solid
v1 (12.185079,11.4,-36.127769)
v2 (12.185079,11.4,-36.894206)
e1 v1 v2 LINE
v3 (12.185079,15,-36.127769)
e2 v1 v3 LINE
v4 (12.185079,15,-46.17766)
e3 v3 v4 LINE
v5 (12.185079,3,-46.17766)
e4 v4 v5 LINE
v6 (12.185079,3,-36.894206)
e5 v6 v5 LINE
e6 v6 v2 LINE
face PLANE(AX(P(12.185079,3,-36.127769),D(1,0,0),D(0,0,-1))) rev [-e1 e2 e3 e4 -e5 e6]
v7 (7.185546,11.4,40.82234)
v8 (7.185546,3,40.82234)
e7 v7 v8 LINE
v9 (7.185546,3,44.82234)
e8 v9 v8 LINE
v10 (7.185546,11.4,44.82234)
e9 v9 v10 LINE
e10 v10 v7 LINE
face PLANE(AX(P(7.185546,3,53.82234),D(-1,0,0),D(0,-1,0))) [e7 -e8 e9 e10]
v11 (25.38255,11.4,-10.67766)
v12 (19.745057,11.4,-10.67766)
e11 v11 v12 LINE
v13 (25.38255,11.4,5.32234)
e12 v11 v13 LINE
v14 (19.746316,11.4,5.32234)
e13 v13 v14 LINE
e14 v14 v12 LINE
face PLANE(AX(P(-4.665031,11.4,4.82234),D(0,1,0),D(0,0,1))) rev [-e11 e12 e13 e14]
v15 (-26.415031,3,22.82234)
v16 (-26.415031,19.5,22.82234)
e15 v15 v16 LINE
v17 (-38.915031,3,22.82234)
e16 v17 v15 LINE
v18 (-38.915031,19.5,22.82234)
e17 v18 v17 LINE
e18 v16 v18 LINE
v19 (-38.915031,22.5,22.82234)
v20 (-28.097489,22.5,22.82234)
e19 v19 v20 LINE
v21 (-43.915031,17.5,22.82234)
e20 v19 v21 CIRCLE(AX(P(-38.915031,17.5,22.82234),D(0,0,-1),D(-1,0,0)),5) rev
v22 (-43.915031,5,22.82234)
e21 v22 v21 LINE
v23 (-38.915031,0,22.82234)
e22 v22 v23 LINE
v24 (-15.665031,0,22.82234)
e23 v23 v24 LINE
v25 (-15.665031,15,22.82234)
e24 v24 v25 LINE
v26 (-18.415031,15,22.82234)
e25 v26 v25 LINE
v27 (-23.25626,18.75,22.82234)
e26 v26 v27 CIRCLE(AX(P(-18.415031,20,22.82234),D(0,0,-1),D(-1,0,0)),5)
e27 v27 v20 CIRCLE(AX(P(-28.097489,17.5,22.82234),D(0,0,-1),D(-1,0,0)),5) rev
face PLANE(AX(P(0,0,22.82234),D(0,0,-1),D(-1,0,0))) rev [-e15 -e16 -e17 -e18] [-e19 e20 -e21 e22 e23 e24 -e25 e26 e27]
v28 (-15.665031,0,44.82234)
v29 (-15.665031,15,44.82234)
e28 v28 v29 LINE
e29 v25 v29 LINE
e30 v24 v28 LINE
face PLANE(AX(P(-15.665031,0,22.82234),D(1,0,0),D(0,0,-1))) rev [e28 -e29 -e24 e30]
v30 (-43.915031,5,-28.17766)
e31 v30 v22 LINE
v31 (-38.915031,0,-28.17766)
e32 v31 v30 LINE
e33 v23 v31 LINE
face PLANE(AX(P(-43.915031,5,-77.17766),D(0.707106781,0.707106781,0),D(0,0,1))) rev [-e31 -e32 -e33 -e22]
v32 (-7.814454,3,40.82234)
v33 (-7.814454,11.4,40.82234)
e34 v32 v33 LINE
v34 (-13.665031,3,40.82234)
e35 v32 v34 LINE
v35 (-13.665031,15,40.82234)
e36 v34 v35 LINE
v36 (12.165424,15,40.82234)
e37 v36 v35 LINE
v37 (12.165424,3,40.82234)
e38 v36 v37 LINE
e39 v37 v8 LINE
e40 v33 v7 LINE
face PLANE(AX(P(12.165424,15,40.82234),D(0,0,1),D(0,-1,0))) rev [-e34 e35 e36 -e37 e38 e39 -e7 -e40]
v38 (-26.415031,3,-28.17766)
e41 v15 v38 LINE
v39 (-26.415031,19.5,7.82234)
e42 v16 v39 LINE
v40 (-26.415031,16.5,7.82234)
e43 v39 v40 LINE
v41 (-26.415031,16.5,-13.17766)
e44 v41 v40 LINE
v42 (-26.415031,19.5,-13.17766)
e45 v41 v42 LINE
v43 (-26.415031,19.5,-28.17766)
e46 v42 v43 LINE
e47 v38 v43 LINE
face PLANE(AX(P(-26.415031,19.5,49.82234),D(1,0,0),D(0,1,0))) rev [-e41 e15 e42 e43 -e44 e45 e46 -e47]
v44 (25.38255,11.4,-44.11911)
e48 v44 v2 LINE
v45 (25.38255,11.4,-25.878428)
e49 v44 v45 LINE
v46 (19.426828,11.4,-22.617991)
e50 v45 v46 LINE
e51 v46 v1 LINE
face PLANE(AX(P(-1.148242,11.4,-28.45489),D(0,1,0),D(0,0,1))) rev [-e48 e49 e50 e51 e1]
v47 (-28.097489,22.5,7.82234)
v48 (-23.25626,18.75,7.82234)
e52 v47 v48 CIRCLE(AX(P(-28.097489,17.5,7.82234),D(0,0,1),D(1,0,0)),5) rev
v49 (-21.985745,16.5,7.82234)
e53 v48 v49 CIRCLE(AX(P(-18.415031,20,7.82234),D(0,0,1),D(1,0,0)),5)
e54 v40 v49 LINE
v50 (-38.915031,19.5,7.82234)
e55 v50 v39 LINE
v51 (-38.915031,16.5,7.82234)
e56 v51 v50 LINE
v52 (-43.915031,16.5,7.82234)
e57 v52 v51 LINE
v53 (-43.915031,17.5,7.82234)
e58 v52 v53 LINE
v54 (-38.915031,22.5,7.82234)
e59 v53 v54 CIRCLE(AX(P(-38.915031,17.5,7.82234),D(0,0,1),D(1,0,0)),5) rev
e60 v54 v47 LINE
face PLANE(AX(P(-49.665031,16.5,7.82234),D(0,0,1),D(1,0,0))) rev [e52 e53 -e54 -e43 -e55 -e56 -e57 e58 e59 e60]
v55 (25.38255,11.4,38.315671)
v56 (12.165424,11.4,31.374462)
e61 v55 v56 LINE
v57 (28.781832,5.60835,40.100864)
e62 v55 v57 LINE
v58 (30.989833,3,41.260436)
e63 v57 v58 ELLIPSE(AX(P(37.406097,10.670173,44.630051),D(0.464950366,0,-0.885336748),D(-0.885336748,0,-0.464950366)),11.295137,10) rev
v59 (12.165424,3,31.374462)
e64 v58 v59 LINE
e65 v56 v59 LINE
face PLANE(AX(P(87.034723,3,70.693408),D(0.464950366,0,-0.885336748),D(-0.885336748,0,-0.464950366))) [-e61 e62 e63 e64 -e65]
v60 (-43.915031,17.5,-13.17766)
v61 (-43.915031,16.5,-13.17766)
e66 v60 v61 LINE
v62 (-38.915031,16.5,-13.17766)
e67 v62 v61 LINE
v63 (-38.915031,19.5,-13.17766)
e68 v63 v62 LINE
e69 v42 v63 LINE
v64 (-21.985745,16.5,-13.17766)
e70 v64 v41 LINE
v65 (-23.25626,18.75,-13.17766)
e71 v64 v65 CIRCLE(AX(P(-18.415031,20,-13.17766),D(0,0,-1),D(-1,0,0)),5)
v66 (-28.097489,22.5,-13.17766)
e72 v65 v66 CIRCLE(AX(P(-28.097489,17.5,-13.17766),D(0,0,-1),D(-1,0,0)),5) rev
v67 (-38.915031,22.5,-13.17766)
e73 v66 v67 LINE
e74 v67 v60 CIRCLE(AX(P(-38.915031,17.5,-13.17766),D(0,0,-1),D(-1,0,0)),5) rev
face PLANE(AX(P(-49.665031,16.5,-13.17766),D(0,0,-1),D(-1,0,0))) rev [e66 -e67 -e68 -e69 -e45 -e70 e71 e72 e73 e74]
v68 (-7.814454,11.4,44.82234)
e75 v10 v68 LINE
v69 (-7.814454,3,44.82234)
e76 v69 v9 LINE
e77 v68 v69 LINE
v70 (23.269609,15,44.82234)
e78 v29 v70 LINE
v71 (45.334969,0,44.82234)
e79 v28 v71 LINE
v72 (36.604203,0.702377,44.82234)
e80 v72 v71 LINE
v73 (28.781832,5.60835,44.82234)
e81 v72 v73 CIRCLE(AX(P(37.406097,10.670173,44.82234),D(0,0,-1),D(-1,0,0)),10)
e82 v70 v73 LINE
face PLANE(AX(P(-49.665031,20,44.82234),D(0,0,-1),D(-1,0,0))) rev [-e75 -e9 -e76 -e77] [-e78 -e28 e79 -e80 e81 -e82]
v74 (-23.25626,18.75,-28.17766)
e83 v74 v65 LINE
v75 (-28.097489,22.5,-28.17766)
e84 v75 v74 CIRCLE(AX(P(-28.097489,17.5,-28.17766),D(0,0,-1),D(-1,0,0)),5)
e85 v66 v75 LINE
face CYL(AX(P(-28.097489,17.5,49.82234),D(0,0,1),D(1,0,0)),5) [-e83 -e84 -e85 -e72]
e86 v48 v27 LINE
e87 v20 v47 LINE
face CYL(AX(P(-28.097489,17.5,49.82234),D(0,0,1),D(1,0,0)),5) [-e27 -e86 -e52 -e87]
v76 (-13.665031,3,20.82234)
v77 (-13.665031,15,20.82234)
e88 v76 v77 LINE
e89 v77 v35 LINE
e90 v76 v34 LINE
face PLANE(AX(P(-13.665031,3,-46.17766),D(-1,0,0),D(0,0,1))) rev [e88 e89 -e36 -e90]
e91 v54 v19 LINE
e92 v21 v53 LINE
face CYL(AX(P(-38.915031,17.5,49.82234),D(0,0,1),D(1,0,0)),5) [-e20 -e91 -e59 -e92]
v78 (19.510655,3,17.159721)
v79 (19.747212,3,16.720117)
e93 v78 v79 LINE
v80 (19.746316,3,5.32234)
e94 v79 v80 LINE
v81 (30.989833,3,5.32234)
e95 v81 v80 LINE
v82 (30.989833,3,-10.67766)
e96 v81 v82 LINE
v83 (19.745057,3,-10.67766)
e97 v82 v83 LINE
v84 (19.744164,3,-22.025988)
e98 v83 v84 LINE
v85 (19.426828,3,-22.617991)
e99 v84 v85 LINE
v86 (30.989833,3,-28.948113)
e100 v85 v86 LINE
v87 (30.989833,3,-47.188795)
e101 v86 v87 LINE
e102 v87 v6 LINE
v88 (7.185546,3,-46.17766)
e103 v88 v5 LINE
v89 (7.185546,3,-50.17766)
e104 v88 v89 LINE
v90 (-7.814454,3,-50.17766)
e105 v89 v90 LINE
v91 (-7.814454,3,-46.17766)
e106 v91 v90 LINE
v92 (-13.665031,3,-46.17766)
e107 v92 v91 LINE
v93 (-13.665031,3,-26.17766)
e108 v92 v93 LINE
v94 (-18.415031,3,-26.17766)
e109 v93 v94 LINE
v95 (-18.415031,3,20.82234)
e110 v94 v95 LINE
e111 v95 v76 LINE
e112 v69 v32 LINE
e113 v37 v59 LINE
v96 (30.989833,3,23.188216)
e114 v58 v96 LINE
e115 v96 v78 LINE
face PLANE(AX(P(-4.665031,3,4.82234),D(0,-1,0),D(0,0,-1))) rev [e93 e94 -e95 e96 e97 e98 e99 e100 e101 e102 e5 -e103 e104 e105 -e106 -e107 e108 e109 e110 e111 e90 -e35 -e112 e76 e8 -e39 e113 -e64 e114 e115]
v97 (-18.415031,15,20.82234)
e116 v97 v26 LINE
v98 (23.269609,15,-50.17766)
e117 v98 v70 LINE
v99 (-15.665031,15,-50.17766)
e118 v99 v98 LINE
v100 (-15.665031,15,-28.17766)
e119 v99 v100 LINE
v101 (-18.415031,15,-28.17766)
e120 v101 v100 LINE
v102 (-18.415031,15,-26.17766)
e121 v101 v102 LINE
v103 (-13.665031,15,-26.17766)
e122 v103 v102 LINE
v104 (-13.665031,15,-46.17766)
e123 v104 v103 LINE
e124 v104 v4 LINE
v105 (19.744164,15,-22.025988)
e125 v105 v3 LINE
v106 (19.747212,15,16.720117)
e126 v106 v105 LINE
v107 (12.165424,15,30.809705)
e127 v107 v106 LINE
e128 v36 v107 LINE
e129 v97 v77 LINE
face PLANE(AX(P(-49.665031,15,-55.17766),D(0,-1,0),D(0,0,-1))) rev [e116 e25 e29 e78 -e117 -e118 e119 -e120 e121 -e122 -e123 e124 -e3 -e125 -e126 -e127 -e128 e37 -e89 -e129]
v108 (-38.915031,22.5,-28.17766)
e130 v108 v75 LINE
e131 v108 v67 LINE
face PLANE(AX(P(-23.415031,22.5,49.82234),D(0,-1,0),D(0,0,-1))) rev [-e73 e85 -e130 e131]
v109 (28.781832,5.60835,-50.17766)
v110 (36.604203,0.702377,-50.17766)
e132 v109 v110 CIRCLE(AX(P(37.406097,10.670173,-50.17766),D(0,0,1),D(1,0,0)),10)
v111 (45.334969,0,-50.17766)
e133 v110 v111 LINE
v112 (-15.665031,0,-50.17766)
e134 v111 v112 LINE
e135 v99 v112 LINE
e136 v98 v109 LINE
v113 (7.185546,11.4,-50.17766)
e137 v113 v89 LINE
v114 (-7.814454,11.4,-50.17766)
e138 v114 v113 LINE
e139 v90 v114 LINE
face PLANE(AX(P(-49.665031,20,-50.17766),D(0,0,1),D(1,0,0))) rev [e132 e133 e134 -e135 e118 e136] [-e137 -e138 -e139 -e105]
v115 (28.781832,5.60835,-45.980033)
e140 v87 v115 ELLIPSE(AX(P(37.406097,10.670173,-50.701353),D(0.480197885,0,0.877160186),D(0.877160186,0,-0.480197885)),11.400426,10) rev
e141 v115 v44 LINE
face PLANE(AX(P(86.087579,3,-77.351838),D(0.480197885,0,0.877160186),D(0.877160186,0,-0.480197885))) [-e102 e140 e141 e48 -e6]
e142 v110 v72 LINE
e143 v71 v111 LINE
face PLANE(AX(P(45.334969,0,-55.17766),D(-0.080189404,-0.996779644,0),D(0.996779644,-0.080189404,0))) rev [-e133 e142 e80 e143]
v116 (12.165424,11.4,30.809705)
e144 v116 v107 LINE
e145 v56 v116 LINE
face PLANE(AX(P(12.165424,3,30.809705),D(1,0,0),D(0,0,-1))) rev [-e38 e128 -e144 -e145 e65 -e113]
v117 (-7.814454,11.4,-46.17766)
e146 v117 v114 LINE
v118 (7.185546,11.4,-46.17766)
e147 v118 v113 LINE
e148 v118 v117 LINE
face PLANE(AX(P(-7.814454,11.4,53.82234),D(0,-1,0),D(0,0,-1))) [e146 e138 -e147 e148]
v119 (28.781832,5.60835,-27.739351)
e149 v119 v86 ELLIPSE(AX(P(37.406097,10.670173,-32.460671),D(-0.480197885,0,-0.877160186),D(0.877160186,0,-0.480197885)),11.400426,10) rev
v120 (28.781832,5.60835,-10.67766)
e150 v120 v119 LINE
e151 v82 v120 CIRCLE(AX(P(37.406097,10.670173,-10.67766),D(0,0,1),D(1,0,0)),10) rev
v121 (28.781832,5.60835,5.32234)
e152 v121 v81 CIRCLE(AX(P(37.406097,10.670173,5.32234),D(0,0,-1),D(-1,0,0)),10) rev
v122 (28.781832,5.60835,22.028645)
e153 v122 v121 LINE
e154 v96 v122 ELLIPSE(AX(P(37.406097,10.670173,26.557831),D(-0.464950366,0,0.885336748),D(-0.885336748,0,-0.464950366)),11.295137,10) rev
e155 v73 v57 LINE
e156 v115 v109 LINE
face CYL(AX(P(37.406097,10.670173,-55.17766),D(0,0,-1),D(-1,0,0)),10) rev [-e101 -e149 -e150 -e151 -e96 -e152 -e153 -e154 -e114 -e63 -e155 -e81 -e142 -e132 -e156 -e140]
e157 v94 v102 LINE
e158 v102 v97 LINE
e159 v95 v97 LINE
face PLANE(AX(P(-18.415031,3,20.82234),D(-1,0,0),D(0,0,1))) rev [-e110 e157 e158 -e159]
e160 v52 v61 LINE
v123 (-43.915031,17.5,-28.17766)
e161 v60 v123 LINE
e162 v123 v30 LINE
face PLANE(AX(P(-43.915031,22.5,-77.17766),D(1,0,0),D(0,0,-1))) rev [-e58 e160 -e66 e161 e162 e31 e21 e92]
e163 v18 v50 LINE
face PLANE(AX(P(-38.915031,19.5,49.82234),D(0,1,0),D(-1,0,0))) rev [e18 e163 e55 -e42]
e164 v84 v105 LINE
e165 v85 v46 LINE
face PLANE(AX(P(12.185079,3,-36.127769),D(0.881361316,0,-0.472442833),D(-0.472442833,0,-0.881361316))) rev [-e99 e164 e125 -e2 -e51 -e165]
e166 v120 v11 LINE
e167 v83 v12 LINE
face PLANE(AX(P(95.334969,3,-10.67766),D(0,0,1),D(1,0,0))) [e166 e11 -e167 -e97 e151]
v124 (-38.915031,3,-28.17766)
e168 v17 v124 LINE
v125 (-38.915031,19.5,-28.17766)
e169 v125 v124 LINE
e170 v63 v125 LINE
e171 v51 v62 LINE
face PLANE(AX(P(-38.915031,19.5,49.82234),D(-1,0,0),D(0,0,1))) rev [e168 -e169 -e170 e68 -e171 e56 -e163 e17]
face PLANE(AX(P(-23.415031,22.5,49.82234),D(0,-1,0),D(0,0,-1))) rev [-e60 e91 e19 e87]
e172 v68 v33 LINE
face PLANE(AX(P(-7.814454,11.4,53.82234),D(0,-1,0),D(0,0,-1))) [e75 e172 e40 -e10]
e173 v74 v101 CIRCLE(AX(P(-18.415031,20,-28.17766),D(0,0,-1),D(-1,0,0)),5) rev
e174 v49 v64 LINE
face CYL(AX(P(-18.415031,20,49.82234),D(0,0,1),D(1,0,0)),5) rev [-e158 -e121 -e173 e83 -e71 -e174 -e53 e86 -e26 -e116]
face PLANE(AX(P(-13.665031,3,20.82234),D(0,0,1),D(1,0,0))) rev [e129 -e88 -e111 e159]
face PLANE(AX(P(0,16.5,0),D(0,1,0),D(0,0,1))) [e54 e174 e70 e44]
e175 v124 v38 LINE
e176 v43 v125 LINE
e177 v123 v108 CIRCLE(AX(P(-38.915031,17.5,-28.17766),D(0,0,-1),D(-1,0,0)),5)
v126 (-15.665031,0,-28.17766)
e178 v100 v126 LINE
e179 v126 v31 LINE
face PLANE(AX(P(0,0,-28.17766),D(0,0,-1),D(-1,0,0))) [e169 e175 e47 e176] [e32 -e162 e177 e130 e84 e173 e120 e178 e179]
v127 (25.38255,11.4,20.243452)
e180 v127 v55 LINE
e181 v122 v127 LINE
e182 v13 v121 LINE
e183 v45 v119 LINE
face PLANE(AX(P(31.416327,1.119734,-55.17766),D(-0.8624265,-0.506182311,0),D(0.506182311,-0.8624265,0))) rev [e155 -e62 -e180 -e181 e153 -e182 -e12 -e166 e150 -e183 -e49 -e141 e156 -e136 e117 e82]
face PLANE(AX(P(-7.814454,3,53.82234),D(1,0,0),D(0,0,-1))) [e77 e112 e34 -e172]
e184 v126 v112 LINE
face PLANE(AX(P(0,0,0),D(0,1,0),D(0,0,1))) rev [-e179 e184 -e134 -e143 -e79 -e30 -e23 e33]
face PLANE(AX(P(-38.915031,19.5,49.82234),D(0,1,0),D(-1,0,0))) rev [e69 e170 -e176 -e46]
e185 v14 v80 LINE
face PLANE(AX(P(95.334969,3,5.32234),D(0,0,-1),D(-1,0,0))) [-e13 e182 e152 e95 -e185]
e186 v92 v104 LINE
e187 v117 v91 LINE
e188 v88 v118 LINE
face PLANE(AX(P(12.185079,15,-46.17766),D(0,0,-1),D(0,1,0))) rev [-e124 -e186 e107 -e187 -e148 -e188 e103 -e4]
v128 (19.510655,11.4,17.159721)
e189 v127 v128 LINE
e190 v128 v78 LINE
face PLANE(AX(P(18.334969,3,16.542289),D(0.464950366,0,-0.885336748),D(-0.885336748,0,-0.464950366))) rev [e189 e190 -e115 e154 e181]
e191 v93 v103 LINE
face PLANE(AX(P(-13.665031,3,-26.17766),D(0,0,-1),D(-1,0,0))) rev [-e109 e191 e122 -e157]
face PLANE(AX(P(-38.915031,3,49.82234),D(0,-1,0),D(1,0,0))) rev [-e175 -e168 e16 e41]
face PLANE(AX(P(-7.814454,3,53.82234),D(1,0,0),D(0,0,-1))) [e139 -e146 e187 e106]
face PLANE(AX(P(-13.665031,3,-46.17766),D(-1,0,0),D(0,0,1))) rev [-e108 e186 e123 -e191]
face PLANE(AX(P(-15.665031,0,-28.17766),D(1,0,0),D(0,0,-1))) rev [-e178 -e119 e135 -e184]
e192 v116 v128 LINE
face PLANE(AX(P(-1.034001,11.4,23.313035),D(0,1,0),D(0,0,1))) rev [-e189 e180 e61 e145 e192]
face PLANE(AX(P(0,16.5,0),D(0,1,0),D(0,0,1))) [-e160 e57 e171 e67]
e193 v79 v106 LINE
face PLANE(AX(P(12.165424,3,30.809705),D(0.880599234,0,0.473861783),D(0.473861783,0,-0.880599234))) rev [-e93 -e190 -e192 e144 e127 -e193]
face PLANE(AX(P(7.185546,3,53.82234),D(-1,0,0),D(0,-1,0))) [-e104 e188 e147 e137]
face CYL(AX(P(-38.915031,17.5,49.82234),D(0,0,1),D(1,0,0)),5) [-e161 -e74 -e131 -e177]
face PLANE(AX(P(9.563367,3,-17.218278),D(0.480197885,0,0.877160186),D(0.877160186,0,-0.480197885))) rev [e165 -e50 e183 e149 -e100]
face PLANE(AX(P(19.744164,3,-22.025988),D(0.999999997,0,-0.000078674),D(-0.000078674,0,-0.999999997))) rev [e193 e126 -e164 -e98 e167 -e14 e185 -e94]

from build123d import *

# Parameters (mm, degrees)
SKETCH1_W                = 95
SKETCH1_H                = 95
BOSS_EXTRUDE1_DEPTH      = 20
SKETCH2_W                = 15
SKETCH2_H                = 8.4
CUT_EXTRUDE1_DEPTH       = 50
CUT_EXTRUDE3_DEPTH       = 100
FILLET1_R                = 10
CUT_EXTRUDE4_DEPTH       = 17
SKETCH8_W                = 15
SKETCH8_H                = 8.4
CUT_EXTRUDE5_DEPTH       = 4
SKETCH9_W                = 15
SKETCH9_H                = 8.4
CUT_EXTRUDE6_DEPTH       = 4
SKETCH10_W               = 15
SKETCH10_H               = 8.4
CUT_EXTRUDE7_DEPTH       = 100
SKETCH11_W               = 15
SKETCH11_H               = 8.4
CUT_EXTRUDE8_DEPTH       = 100
SKETCH12_W               = 96.22761595
SKETCH12_H               = 5
CUT_EXTRUDE9_DEPTH       = 100
SKETCH14_W               = 16
SKETCH14_H               = 8.4
CUT_EXTRUDE10_DEPTH      = 100
SKETCH15_W               = 16
SKETCH15_H               = 8.4
CUT_EXTRUDE11_DEPTH      = 100
SKETCH16_W               = 16
SKETCH16_H               = 8.4
CUT_EXTRUDE13_DEPTH      = 100
CUT_EXTRUDE16_DEPTH      = 12
SKETCH21_W               = 23.779532914
SKETCH21_H               = 2
BOSS_EXTRUDE2_DEPTH      = 12
SKETCH23_W               = 23.759878039
SKETCH23_H               = 2
BOSS_EXTRUDE3_DEPTH      = 12
CUT_EXTRUDE19_DEPTH      = 100
CUT_EXTRUDE19_DEPTH_BACK = 100
SKETCH24_W               = 15
SKETCH24_H               = 8.4
SKETCH26_W               = 20
SKETCH26_H               = 95
BOSS_EXTRUDE4_DEPTH      = 20
SKETCH31_W               = 95
SKETCH31_H               = 20
BOSS_EXTRUDE6_DEPTH      = 10
SKETCH32_W               = 12.5
SKETCH32_H               = 16.5
CUT_EXTRUDE22_DEPTH      = 100
SKETCH33_W               = 3.75
SKETCH33_H               = 20
CUT_EXTRUDE23_DEPTH      = 100
SKETCH34_W               = 26.25
SKETCH34_H               = 12.5
CUT_EXTRUDE24_DEPTH      = 100
SKETCH35_W               = 34
SKETCH35_H               = 47.07285681
CUT_EXTRUDE25_DEPTH      = 22
SKETCH36_W               = 34
SKETCH36_H               = 30.604426896
CUT_EXTRUDE26_DEPTH      = 22
SKETCH37_W               = 26.25
SKETCH37_H               = 21
CUT_EXTRUDE28_DEPTH      = 6
SKETCH38_W               = 5.75
SKETCH38_H               = 22.5
CUT_EXTRUDE29_DEPTH      = 100
CHAMFER1_SIZE            = 5
SKETCH39_W               = 2.070576792
SKETCH39_H               = 87
CUT_EXTRUDE30_DEPTH      = 12
FILLET4_R                = 5
FILLET5_R                = 5
SKETCH40_W               = 4.75
SKETCH40_H               = 47
CUT_EXTRUDE31_DEPTH      = 12
FILLET6_R                = 5


with BuildPart() as part:
    # Sketch1 → Boss-Extrude1 (new body)
    with BuildSketch(Plane(origin=(0, 0, 0), x_dir=(1, 0, 0), z_dir=(0, 1, 0))):
        with Locations((-2.165031067, 2.677660124)):
            Rectangle(SKETCH1_W, SKETCH1_H)
    extrude(amount=BOSS_EXTRUDE1_DEPTH)

    # Sketch2 → Cut-Extrude1 (cut)
    with BuildSketch(Plane(origin=(45.334968933, 0, 0), x_dir=(0, 0, -1), z_dir=(1, 0, 0))):
        with Locations((2.677660124, 7.2)):
            Rectangle(SKETCH2_W, SKETCH2_H)
    extrude(amount=-CUT_EXTRUDE1_DEPTH, mode=Mode.SUBTRACT)

    # Sketch6 → Cut-Extrude3 (cut)
    with BuildSketch(Plane.XY.offset(44.822339876)):
        Polygon((45.334968933, 0), (31.416327077, 1.119733542), (20.334968933, 20), (45.334968933, 20), align=None)
    extrude(amount=-CUT_EXTRUDE3_DEPTH, mode=Mode.SUBTRACT)

    # Fillet1
    # the kernel refuses this fillet: 10 mm, written as the material it adds along each edge
    with BuildSketch(Plane(origin=(31.416327077, 1.119733542, 44.822339876), x_dir=(0.9967796443594351, -0.08018940447888392, 0), z_dir=(0, 0, -1))) as fillet1_piece_1_section:
        with BuildLine():
            CenterArc((FILLET1_R * 0.52046366993, -FILLET1_R), FILLET1_R, 90, 54.990678882)
            Line((-FILLET1_R * 0.298595051697, -FILLET1_R * 0.426290308146), (0, 0))
            Line((0, 0), (FILLET1_R * 0.52046366993, 0))
        make_face()
    fillet1_piece_1 = extrude(amount=95, mode=Mode.PRIVATE)
    fillet1_piece_1 = split(fillet1_piece_1, bisect_by=Plane(origin=(32.462514907, 1.548685907, 4.822339876), z_dir=(0, 0, 1)), keep=Keep.TOP, mode=Mode.PRIVATE)
    fillet1_piece_1 = split(fillet1_piece_1, bisect_by=Plane(origin=(32.462514907, 3, 24.822339876), z_dir=(0, -1, 0)), keep=Keep.TOP, mode=Mode.PRIVATE)
    add(fillet1_piece_1)
    with BuildSketch(Plane(origin=(31.416327077, 1.119733542, 44.822339876), x_dir=(0.9967796443594351, -0.08018940447888392, 0), z_dir=(0, 0, -1))) as fillet1_piece_2_section:
        with BuildLine():
            CenterArc((FILLET1_R * 0.52046366993, -FILLET1_R), FILLET1_R, 90, 54.990678882)
            Line((-FILLET1_R * 0.298595051697, -FILLET1_R * 0.426290308146), (0, 0))
            Line((0, 0), (FILLET1_R * 0.52046366993, 0))
        make_face()
    fillet1_piece_2 = extrude(amount=95, mode=Mode.PRIVATE)
    fillet1_piece_2 = split(fillet1_piece_2, bisect_by=Plane(origin=(29.780943428, 3.965739863, 4.822339876), z_dir=(0, 0, 1)), keep=Keep.TOP, mode=Mode.PRIVATE)
    fillet1_piece_2 = split(fillet1_piece_2, bisect_by=Plane(origin=(29.780943428, 3, 24.822339876), z_dir=(0, 1, 0)), keep=Keep.TOP, mode=Mode.PRIVATE)
    add(fillet1_piece_2)
    with BuildSketch(Plane(origin=(31.416327077, 1.119733542, 44.822339876), x_dir=(0.9967796443594351, -0.08018940447888392, 0), z_dir=(0, 0, -1))) as fillet1_piece_3_section:
        with BuildLine():
            CenterArc((FILLET1_R * 0.52046366993, -FILLET1_R), FILLET1_R, 90, 54.990678882)
            Line((-FILLET1_R * 0.298595051697, -FILLET1_R * 0.426290308146), (0, 0))
            Line((0, 0), (FILLET1_R * 0.52046366993, 0))
        make_face()
    fillet1_piece_3 = extrude(amount=95, mode=Mode.PRIVATE)
    fillet1_piece_3 = split(fillet1_piece_3, bisect_by=Plane(origin=(32.462514907, 1.548685907, -10.177660124), z_dir=(0, 0, 1)), keep=Keep.TOP, mode=Mode.PRIVATE)
    fillet1_piece_3 = split(fillet1_piece_3, bisect_by=Plane(origin=(32.462514907, 1.548685907, 4.822339876), z_dir=(0, 0, -1)), keep=Keep.TOP, mode=Mode.PRIVATE)
    fillet1_piece_3 = split(fillet1_piece_3, bisect_by=Plane(origin=(32.462514907, 3, -2.677660124), z_dir=(0, -1, 0)), keep=Keep.TOP, mode=Mode.PRIVATE)
    add(fillet1_piece_3)
    with BuildSketch(Plane(origin=(31.416327077, 1.119733542, 44.822339876), x_dir=(0.9967796443594351, -0.08018940447888392, 0), z_dir=(0, 0, -1))) as fillet1_piece_4_section:
        with BuildLine():
            CenterArc((FILLET1_R * 0.52046366993, -FILLET1_R), FILLET1_R, 90, 54.990678882)
            Line((-FILLET1_R * 0.298595051697, -FILLET1_R * 0.426290308146), (0, 0))
            Line((0, 0), (FILLET1_R * 0.52046366993, 0))
        make_face()
    fillet1_piece_4 = extrude(amount=95, mode=Mode.PRIVATE)
    fillet1_piece_4 = split(fillet1_piece_4, bisect_by=Plane(origin=(32.462514907, 1.548685907, -10.177660124), z_dir=(0, 0, -1)), keep=Keep.TOP, mode=Mode.PRIVATE)
    fillet1_piece_4 = split(fillet1_piece_4, bisect_by=Plane(origin=(32.462514907, 3, -30.177660124), z_dir=(0, -1, 0)), keep=Keep.TOP, mode=Mode.PRIVATE)
    add(fillet1_piece_4)
    with BuildSketch(Plane(origin=(31.416327077, 1.119733542, 44.822339876), x_dir=(0.9967796443594351, -0.08018940447888392, 0), z_dir=(0, 0, -1))) as fillet1_piece_5_section:
        with BuildLine():
            CenterArc((FILLET1_R * 0.52046366993, -FILLET1_R), FILLET1_R, 90, 54.990678882)
            Line((-FILLET1_R * 0.298595051697, -FILLET1_R * 0.426290308146), (0, 0))
            Line((0, 0), (FILLET1_R * 0.52046366993, 0))
        make_face()
    fillet1_piece_5 = extrude(amount=95, mode=Mode.PRIVATE)
    fillet1_piece_5 = split(fillet1_piece_5, bisect_by=Plane(origin=(29.780943428, 3.965739863, -10.177660124), z_dir=(0, 0, -1)), keep=Keep.TOP, mode=Mode.PRIVATE)
    fillet1_piece_5 = split(fillet1_piece_5, bisect_by=Plane(origin=(29.780943428, 3, -30.177660124), z_dir=(0, 1, 0)), keep=Keep.TOP, mode=Mode.PRIVATE)
    add(fillet1_piece_5)

    # Sketch7 → Cut-Extrude4 (cut)
    with BuildSketch(Plane(origin=(0, 20, 0), x_dir=(1, 0, 0), z_dir=(0, 1, 0))):
        Polygon((11.360713437, -29.822339876), (18.334968933, -16.542288661), (9.481601456, -11.892784997), (2.50734596, -25.172836212), align=None)
        Polygon((18.334968933, 22.020257336), (11.132000664, 35.177660124), (2.360398805, 30.375681278), (9.563367074, 17.21827849), align=None)
    extrude(amount=-CUT_EXTRUDE4_DEPTH, mode=Mode.SUBTRACT)

    # Sketch8 → Cut-Extrude5 (cut)
    with BuildSketch(Plane(origin=(12.327397833, 0, 6.473952599), x_dir=(0.4649503663833249, 0, -0.885336747684186), z_dir=(0.8853367476841859, 0, 0.4649503663833248))):
        with Locations((-13.620645519, 7.2)):
            Rectangle(SKETCH8_W, SKETCH8_H)
    extrude(amount=-CUT_EXTRUDE5_DEPTH, mode=Mode.SUBTRACT)

    # Sketch9 → Cut-Extrude6 (cut)
    with BuildSketch(Plane(origin=(14.610669282, 0, -7.99855328), x_dir=(-0.48019788460400603, 0, -0.8771601858394155), z_dir=(0.8771601858394155, 0, -0.48019788460400603))):
        with Locations((18.010879722, 7.2)):
            Rectangle(SKETCH9_W, SKETCH9_H)
    extrude(amount=-CUT_EXTRUDE6_DEPTH, mode=Mode.SUBTRACT)

    # Sketch10 → Cut-Extrude7 (cut)
    with BuildSketch(Plane(origin=(8.786050842, 0, 4.614151134), x_dir=(0.464950366383325, 0, -0.8853367476841859), z_dir=(0.8853367476841859, 0, 0.464950366383325))):
        with Locations((-13.620645519, 7.2)):
            Rectangle(SKETCH10_W, SKETCH10_H)
    extrude(amount=CUT_EXTRUDE7_DEPTH, mode=Mode.SUBTRACT)

    # Sketch11 → Cut-Extrude8 (cut)
    with BuildSketch(Plane(origin=(11.102028539, 0, -6.077761742), x_dir=(-0.48019788460400603, 0, -0.8771601858394155), z_dir=(0.8771601858394155, 0, -0.48019788460400603))):
        with Locations((18.010879722, 7.2)):
            Rectangle(SKETCH11_W, SKETCH11_H)
    extrude(amount=CUT_EXTRUDE8_DEPTH, mode=Mode.SUBTRACT)

    # Sketch12 → Cut-Extrude9 (cut)
    with BuildSketch(Plane.XY.offset(44.822339876)):
        with Locations((-1.551223092, 17.5)):
            Rectangle(SKETCH12_W, SKETCH12_H)
    extrude(amount=-CUT_EXTRUDE9_DEPTH, mode=Mode.SUBTRACT)

    # Sketch14 → Cut-Extrude10 (cut)
    with BuildSketch(Plane(origin=(11.102028539, 0, -6.077761742), x_dir=(-0.48019788460400603, 0, -0.8771601858394155), z_dir=(0.8771601858394155, 0, -0.48019788460400603))):
        with Locations((18.510879722, 7.2)):
            Rectangle(SKETCH14_W, SKETCH14_H)
    extrude(amount=CUT_EXTRUDE10_DEPTH, mode=Mode.SUBTRACT)

    # Sketch15 → Cut-Extrude11 (cut)
    with BuildSketch(Plane(origin=(8.786050842, 0, 4.614151134), x_dir=(0.464950366383325, 0, -0.8853367476841859), z_dir=(0.8853367476841859, 0, 0.464950366383325))):
        with Locations((-14.120645519, 7.2)):
            Rectangle(SKETCH15_W, SKETCH15_H)
    extrude(amount=CUT_EXTRUDE11_DEPTH, mode=Mode.SUBTRACT)

    # Sketch16 → Cut-Extrude13 (cut)
    with BuildSketch(Plane(origin=(-4.665031067, 0, 0), x_dir=(0, 0, -1), z_dir=(1, 0, 0))):
        with Locations((2.677660124, 7.2)):
            Rectangle(SKETCH16_W, SKETCH16_H)
    extrude(amount=CUT_EXTRUDE13_DEPTH, mode=Mode.SUBTRACT)

    # Sketch19 → Cut-Extrude16 (cut)
    with BuildSketch(Plane(origin=(0, 15, 0), x_dir=(1, 0, 0), z_dir=(0, 1, 0))):
        Polygon((12.165423764, -30.809704699), (19.747212292, -16.720116958), (19.744163962, 22.025988312), (12.185078639, 36.127769372), (12.185078639, 48.177660124), (-11.594454275, 48.177660124), (-11.594454275, -42.822339876), (12.165423764, -42.822339876), align=None)
    extrude(amount=-CUT_EXTRUDE16_DEPTH, mode=Mode.SUBTRACT)

    # Sketch21 → Boss-Extrude2 (add)
    with BuildSketch(Plane(origin=(0, 3, 0), x_dir=(1, 0, 0), z_dir=(0, 1, 0))):
        with Locations((0.295312182, 47.177660124)):
            Rectangle(SKETCH21_W, SKETCH21_H)
    extrude(amount=BOSS_EXTRUDE2_DEPTH)

    # Sketch23 → Boss-Extrude3 (add)
    with BuildSketch(Plane(origin=(0, 3, 0), x_dir=(1, 0, 0), z_dir=(0, 1, 0))):
        with Locations((0.285484745, -41.822339876)):
            Rectangle(SKETCH23_W, SKETCH23_H)
    extrude(amount=BOSS_EXTRUDE3_DEPTH)

    # Sketch24 → Cut-Extrude19 (cut, two sides: drawn at the far end of the back side and taken through both)
    with BuildSketch(Plane.XY.offset(-46.177660124).offset(-CUT_EXTRUDE19_DEPTH_BACK)):
        with Locations((-0.314454275, 7.2)):
            Rectangle(SKETCH24_W, SKETCH24_H)
    extrude(amount=CUT_EXTRUDE19_DEPTH + CUT_EXTRUDE19_DEPTH_BACK, mode=Mode.SUBTRACT)

    # Sketch26 → Boss-Extrude4 (add)
    with BuildSketch(Plane(origin=(0, 15, 0), x_dir=(1, 0, 0), z_dir=(0, 1, 0))):
        with Locations((-39.665031067, 2.677660124)):
            Rectangle(SKETCH26_W, SKETCH26_H)
    extrude(amount=BOSS_EXTRUDE4_DEPTH)

    # Sketch31 → Boss-Extrude6 (add)
    with BuildSketch(Plane(origin=(-29.665031067, 0, 0), x_dir=(0, 0, -1), z_dir=(1, 0, 0))):
        with Locations((2.677660124, 25)):
            Rectangle(SKETCH31_W, SKETCH31_H)
    extrude(amount=BOSS_EXTRUDE6_DEPTH)

    # Sketch32 → Cut-Extrude22 (cut)
    with BuildSketch(Plane(origin=(0, 0, -50.177660124), x_dir=(-1, 0, 0), z_dir=(0, 0, -1))):
        with Locations((32.665031067, 11.25)):
            Rectangle(SKETCH32_W, SKETCH32_H)
    extrude(amount=-CUT_EXTRUDE22_DEPTH, mode=Mode.SUBTRACT)

    # Sketch33 → Cut-Extrude23 (cut)
    with BuildSketch(Plane(origin=(0, 0, -50.177660124), x_dir=(-1, 0, 0), z_dir=(0, 0, -1))):
        with Locations((21.540031067, 25)):
            Rectangle(SKETCH33_W, SKETCH33_H)
    extrude(amount=-CUT_EXTRUDE23_DEPTH, mode=Mode.SUBTRACT)

    # Sketch34 → Cut-Extrude24 (cut)
    with BuildSketch(Plane(origin=(0, 0, -50.177660124), x_dir=(-1, 0, 0), z_dir=(0, 0, -1))):
        with Locations((36.540031067, 28.75)):
            Rectangle(SKETCH34_W, SKETCH34_H)
    extrude(amount=-CUT_EXTRUDE24_DEPTH, mode=Mode.SUBTRACT)

    # Sketch35 → Cut-Extrude25 (cut)
    with BuildSketch(Plane(origin=(0, 0, -50.177660124), x_dir=(-1, 0, 0), z_dir=(0, 0, -1))):
        with Locations((32.665031067, 23.536428405)):
            Rectangle(SKETCH35_W, SKETCH35_H)
    extrude(amount=-CUT_EXTRUDE25_DEPTH, mode=Mode.SUBTRACT)

    # Sketch36 → Cut-Extrude26 (cut)
    with BuildSketch(Plane.XY.offset(44.822339876)):
        with Locations((-32.665031067, 15.302213448)):
            Rectangle(SKETCH36_W, SKETCH36_H)
    extrude(amount=-CUT_EXTRUDE26_DEPTH, mode=Mode.SUBTRACT)

    # Sketch37 → Cut-Extrude28 (cut)
    with BuildSketch(Plane(origin=(0, 22.5, 0), x_dir=(1, 0, 0), z_dir=(0, 1, 0))):
        with Locations((-36.540031067, 2.677660124)):
            Rectangle(SKETCH37_W, SKETCH37_H)
    extrude(amount=-CUT_EXTRUDE28_DEPTH, mode=Mode.SUBTRACT)

    # Sketch38 → Cut-Extrude29 (cut)
    with BuildSketch(Plane.XY.offset(22.822339876)):
        with Locations((-46.790031067, 11.25)):
            Rectangle(SKETCH38_W, SKETCH38_H)
    extrude(amount=-CUT_EXTRUDE29_DEPTH, mode=Mode.SUBTRACT)

    # Chamfer1
    chamfer1_edges = [part.edges().sort_by_distance(p)[0] for p in [
        (-43.915031067, 0, -2.677660124),
    ]]
    chamfer(chamfer1_edges, length=CHAMFER1_SIZE)

    # Sketch39 → Cut-Extrude30 (cut)
    with BuildSketch(Plane(origin=(0, 15, 0), x_dir=(1, 0, 0), z_dir=(0, 1, 0))):
        with Locations((-12.629742671, 2.677660124)):
            Rectangle(SKETCH39_W, SKETCH39_H)
    extrude(amount=-CUT_EXTRUDE30_DEPTH, mode=Mode.SUBTRACT)

    # Fillet4
    # the kernel refuses this fillet: 5 mm, written as the material it adds along each edge
    with BuildSketch(Plane(origin=(-23.415031067, 15, -28.177660124), x_dir=(1, 0, 0), z_dir=(0, 0, 1))) as fillet4_piece_1_section:
        with BuildLine():
            CenterArc((FILLET4_R, FILLET4_R), FILLET4_R, 180, 90)
            Line((0, FILLET4_R), (0, 0))
            Line((0, 0), (FILLET4_R, 0))
        make_face()
    fillet4_piece_1 = extrude(amount=51, mode=Mode.PRIVATE)
    fillet4_piece_1 = split(fillet4_piece_1, bisect_by=Plane(origin=(-21.940460429, 15.541584114, -13.177660124), z_dir=(0, 0, -1)), keep=Keep.TOP, mode=Mode.PRIVATE)
    fillet4_piece_1 = split(fillet4_piece_1, bisect_by=Plane(origin=(-21.940460429, 16.5, -20.677660124), z_dir=(0, -1, 0)), keep=Keep.TOP, mode=Mode.PRIVATE)
    add(fillet4_piece_1)
    with BuildSketch(Plane(origin=(-23.415031067, 15, -28.177660124), x_dir=(1, 0, 0), z_dir=(0, 0, 1))) as fillet4_piece_2_section:
        with BuildLine():
            CenterArc((FILLET4_R, FILLET4_R), FILLET4_R, 180, 90)
            Line((0, FILLET4_R), (0, 0))
            Line((0, 0), (FILLET4_R, 0))
        make_face()
    fillet4_piece_2 = extrude(amount=51, mode=Mode.PRIVATE)
    fillet4_piece_2 = split(fillet4_piece_2, bisect_by=Plane(origin=(-23.084676974, 17.513403735, -13.177660124), z_dir=(0, 0, -1)), keep=Keep.TOP, mode=Mode.PRIVATE)
    fillet4_piece_2 = split(fillet4_piece_2, bisect_by=Plane(origin=(-23.084676974, 16.5, -20.677660124), z_dir=(0, 1, 0)), keep=Keep.TOP, mode=Mode.PRIVATE)
    add(fillet4_piece_2)
    with BuildSketch(Plane(origin=(-23.415031067, 15, -28.177660124), x_dir=(1, 0, 0), z_dir=(0, 0, 1))) as fillet4_piece_3_section:
        with BuildLine():
            CenterArc((FILLET4_R, FILLET4_R), FILLET4_R, 180, 90)
            Line((0, FILLET4_R), (0, 0))
            Line((0, 0), (FILLET4_R, 0))
        make_face()
    fillet4_piece_3 = extrude(amount=51, mode=Mode.PRIVATE)
    fillet4_piece_3 = split(fillet4_piece_3, bisect_by=Plane(origin=(-21.940460429, 15.541584114, -13.177660124), z_dir=(0, 0, 1)), keep=Keep.TOP, mode=Mode.PRIVATE)
    fillet4_piece_3 = split(fillet4_piece_3, bisect_by=Plane(origin=(-21.940460429, 16.5, -2.677660124), z_dir=(0, -1, 0)), keep=Keep.TOP, mode=Mode.PRIVATE)
    fillet4_piece_3 = split(fillet4_piece_3, bisect_by=Plane(origin=(-21.940460429, 15.541584114, 7.822339876), z_dir=(0, 0, -1)), keep=Keep.TOP, mode=Mode.PRIVATE)
    add(fillet4_piece_3)
    with BuildSketch(Plane(origin=(-23.415031067, 15, -28.177660124), x_dir=(1, 0, 0), z_dir=(0, 0, 1))) as fillet4_piece_4_section:
        with BuildLine():
            CenterArc((FILLET4_R, FILLET4_R), FILLET4_R, 180, 90)
            Line((0, FILLET4_R), (0, 0))
            Line((0, 0), (FILLET4_R, 0))
        make_face()
    fillet4_piece_4 = extrude(amount=51, mode=Mode.PRIVATE)
    fillet4_piece_4 = split(fillet4_piece_4, bisect_by=Plane(origin=(-21.940460429, 16.5, 15.322339876), z_dir=(0, -1, 0)), keep=Keep.TOP, mode=Mode.PRIVATE)
    fillet4_piece_4 = split(fillet4_piece_4, bisect_by=Plane(origin=(-21.940460429, 15.541584114, 7.822339876), z_dir=(0, 0, 1)), keep=Keep.TOP, mode=Mode.PRIVATE)
    add(fillet4_piece_4)
    with BuildSketch(Plane(origin=(-23.415031067, 15, -28.177660124), x_dir=(1, 0, 0), z_dir=(0, 0, 1))) as fillet4_piece_5_section:
        with BuildLine():
            CenterArc((FILLET4_R, FILLET4_R), FILLET4_R, 180, 90)
            Line((0, FILLET4_R), (0, 0))
            Line((0, 0), (FILLET4_R, 0))
        make_face()
    fillet4_piece_5 = extrude(amount=51, mode=Mode.PRIVATE)
    fillet4_piece_5 = split(fillet4_piece_5, bisect_by=Plane(origin=(-23.084676974, 16.5, 15.322339876), z_dir=(0, 1, 0)), keep=Keep.TOP, mode=Mode.PRIVATE)
    fillet4_piece_5 = split(fillet4_piece_5, bisect_by=Plane(origin=(-23.084676974, 17.513403735, 7.822339876), z_dir=(0, 0, 1)), keep=Keep.TOP, mode=Mode.PRIVATE)
    add(fillet4_piece_5)

    # Fillet5
    fillet5_edges = [part.edges().sort_by_distance(p)[0] for p in [
        (-23.415031067, 22.5, 15.322339876),
        (-23.415031067, 22.5, -20.677660124),
    ]]
    fillet(fillet5_edges, radius=FILLET5_R)

    # Sketch40 → Cut-Extrude31 (cut)
    with BuildSketch(Plane(origin=(0, 15, 0), x_dir=(1, 0, 0), z_dir=(0, 1, 0))):
        with Locations((-16.040031067, 2.677660124)):
            Rectangle(SKETCH40_W, SKETCH40_H)
    extrude(amount=-CUT_EXTRUDE31_DEPTH, mode=Mode.SUBTRACT)

    # Fillet6
    fillet6_edges = [part.edges().sort_by_distance(p)[0] for p in [
        (-43.915031067, 22.5, -20.677660124),
        (-43.915031067, 22.5, 15.322339876),
    ]]
    fillet(fillet6_edges, radius=FILLET6_R)


solid = part.part
